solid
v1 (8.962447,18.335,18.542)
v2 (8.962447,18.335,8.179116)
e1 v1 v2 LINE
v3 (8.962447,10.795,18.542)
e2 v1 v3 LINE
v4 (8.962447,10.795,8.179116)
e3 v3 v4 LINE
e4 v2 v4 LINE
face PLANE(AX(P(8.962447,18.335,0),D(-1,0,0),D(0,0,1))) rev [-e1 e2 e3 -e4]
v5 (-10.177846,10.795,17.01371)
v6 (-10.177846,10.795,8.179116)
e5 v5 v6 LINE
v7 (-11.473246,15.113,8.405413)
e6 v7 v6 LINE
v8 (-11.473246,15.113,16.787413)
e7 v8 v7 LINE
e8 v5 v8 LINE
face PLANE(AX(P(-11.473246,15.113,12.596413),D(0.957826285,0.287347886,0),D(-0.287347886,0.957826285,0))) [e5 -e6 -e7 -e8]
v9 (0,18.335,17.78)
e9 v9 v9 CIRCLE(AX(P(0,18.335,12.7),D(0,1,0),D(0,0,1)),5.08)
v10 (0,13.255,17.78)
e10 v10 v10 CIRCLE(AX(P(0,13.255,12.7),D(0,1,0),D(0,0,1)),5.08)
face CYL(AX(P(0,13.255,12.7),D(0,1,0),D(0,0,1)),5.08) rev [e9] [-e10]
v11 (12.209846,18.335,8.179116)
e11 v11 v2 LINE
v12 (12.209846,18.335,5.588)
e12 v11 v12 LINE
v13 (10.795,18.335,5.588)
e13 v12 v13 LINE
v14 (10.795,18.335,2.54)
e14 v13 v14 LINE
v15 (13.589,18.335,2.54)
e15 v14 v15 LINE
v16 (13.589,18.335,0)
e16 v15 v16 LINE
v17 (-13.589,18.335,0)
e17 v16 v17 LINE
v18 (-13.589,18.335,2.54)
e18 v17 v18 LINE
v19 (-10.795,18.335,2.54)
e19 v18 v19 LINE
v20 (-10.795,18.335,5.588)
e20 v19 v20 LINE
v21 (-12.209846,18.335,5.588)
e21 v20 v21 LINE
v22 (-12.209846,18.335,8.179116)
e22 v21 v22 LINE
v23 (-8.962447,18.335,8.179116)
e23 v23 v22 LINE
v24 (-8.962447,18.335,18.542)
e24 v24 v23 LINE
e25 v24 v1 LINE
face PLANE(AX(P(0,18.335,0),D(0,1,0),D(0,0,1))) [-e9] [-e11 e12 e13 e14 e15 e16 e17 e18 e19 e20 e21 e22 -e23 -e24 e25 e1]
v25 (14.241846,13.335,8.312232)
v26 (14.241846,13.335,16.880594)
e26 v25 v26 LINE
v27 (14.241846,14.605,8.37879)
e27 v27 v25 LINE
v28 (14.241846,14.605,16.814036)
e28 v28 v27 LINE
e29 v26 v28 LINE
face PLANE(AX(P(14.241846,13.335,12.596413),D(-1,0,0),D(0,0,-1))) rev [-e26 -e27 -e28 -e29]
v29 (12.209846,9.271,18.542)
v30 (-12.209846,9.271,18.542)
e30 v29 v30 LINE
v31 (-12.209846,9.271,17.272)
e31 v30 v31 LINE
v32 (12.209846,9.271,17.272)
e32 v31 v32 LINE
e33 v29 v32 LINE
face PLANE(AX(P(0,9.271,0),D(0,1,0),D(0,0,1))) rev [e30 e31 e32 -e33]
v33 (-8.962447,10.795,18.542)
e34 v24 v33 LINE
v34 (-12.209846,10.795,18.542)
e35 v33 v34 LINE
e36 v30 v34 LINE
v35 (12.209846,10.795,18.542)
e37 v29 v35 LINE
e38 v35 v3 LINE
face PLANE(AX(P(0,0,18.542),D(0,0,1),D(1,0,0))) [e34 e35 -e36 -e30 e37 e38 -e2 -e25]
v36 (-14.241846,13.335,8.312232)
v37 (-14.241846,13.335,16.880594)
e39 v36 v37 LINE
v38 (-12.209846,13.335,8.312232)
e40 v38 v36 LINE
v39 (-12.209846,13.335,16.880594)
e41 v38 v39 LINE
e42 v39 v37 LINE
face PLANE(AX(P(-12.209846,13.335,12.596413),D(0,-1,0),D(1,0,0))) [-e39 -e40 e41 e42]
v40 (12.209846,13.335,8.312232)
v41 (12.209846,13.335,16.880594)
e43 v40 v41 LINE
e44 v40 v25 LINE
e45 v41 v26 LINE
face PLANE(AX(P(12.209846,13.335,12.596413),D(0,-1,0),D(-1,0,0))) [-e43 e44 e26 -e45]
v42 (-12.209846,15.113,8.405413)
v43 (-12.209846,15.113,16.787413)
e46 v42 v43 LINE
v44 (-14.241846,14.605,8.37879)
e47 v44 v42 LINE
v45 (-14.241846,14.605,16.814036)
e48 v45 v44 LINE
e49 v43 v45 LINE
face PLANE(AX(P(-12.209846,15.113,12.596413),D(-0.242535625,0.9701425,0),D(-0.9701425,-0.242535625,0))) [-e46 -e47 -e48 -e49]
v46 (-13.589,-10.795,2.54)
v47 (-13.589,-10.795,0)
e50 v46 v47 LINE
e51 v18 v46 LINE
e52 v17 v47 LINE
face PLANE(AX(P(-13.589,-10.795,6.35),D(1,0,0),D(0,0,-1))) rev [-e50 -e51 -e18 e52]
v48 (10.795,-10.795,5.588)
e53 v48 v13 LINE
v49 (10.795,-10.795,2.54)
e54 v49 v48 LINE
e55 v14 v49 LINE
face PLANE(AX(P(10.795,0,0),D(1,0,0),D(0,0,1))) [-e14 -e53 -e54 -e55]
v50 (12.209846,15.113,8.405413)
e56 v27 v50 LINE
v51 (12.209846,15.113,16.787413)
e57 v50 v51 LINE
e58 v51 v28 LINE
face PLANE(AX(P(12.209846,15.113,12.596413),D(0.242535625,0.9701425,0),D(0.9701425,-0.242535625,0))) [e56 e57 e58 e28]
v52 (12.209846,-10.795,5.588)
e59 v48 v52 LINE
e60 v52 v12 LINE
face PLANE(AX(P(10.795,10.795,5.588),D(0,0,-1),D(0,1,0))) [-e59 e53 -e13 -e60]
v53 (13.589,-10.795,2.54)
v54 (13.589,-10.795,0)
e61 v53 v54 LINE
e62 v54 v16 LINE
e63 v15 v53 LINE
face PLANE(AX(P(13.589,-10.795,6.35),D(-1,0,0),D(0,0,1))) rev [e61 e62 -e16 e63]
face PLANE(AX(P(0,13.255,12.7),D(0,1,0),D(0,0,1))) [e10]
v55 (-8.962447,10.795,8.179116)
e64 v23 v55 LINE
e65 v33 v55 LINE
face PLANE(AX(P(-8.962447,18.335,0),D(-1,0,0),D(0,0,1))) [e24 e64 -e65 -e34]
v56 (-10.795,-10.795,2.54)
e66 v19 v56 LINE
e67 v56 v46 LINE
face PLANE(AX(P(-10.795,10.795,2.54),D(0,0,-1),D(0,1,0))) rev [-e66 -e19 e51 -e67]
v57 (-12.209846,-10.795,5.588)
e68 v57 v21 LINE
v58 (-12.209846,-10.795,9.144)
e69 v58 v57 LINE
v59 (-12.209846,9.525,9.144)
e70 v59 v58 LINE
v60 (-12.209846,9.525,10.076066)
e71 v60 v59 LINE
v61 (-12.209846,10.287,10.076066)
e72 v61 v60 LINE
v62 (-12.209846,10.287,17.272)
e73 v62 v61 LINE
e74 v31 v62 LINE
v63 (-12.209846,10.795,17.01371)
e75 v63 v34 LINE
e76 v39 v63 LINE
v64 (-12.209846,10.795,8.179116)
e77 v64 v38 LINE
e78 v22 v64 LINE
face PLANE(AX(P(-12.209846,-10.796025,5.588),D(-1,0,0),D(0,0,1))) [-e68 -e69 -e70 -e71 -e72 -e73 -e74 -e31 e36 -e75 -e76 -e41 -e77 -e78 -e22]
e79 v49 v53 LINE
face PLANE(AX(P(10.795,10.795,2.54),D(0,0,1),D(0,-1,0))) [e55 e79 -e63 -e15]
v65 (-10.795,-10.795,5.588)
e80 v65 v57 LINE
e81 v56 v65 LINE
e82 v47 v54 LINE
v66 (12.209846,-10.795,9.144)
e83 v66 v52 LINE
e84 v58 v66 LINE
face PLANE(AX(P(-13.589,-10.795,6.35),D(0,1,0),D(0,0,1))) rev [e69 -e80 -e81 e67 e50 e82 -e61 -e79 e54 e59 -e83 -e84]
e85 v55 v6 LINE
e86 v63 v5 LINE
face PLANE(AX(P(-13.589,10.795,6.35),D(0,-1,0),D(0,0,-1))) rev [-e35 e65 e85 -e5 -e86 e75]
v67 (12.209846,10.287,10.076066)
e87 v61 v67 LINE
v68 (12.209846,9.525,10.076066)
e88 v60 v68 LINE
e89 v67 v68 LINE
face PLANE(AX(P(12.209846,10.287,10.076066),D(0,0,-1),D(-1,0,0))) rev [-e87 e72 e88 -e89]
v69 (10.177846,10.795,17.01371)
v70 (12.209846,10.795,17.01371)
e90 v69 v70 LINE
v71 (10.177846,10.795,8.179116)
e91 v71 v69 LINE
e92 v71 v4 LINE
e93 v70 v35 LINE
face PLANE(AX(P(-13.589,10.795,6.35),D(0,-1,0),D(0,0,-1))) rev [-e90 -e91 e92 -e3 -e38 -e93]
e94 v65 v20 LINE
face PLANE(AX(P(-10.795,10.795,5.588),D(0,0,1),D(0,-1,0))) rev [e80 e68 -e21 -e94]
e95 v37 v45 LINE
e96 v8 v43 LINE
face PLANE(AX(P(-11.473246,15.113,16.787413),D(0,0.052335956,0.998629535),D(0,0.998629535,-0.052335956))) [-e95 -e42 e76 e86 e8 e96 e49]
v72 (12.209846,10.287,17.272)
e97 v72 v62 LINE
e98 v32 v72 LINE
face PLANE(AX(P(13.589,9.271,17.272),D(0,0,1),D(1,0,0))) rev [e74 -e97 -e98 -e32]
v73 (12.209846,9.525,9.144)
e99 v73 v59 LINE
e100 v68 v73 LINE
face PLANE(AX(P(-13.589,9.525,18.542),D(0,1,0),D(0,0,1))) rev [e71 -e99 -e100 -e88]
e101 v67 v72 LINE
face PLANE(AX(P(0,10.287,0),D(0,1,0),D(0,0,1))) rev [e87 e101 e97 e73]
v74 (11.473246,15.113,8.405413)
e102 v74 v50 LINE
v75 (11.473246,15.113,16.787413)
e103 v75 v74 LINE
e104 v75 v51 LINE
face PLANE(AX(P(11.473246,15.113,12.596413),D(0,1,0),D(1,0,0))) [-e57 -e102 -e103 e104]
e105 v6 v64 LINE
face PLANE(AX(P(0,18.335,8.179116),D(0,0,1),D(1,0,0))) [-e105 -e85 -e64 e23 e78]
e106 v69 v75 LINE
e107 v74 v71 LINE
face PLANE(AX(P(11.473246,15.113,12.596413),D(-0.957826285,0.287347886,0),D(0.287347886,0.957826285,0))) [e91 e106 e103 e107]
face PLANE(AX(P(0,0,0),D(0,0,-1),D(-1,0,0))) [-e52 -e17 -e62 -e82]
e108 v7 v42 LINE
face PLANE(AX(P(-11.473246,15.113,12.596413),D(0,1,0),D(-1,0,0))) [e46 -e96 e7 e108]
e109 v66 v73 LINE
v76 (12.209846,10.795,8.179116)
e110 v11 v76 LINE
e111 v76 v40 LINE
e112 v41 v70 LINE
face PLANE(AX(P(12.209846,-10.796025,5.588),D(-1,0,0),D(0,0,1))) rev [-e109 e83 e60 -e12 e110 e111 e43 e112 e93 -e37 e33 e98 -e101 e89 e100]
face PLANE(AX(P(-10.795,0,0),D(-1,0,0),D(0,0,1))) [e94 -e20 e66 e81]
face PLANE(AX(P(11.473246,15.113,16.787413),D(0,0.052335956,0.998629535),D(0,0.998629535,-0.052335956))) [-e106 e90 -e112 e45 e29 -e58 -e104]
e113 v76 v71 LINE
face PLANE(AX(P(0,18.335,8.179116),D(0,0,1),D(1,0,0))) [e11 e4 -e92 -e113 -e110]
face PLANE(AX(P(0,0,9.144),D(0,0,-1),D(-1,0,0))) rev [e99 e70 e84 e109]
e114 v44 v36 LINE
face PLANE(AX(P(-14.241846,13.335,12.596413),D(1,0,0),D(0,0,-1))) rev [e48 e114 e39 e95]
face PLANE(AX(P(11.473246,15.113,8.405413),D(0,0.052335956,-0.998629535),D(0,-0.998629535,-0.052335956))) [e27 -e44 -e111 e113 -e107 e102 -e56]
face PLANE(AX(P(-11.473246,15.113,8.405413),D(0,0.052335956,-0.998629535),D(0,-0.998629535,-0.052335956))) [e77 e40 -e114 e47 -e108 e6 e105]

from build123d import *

# Parameters (mm, degrees)
SKETCH2_W                       = 27.178
SKETCH2_H                       = 21.59
INITIAL_EXTRUDE_DEPTH           = 6.35
SKETCH3_W                       = 27.178
SKETCH3_H                       = 1.27
INTIAL_EXTRUDE_HORIZONTAL_DEPTH = 12.192
SKETCH4_W                       = 27.178
SKETCH4_H                       = 1.27
SLIGHT_EXTRUDE_VERTICAL_DEPTH   = 0.254
SKETCH5_W                       = 3.048
SKETCH5_H                       = 21.59
CUT_EXTRUDE1_DEPTH              = 2.794
CUT_EXTRUDE2_REACH              = 33.537
SKETCH6_W                       = 1.379153921
SKETCH6_H                       = 12.954
SNAP_START                      = 11.473246079
SNAP_HOOK2_DEPTH                = 0.7366
SNAP_START_2                    = 8.31223189
SNAP_HOOK2_2_DEPTH              = 8.568362063
SNAP_START_3                    = 8.179116131
SNAP_HOOK2_3_DEPTH              = 8.834593581
SNAP_START_4                    = 9
SNAP_HOOK2_4_DEPTH              = 6
BOSS_EXTRUDE1_DEPTH             = 7.54
SKETCH8_W                       = 24.419692158
SKETCH8_H                       = 7.195933706
CUT_EXTRUDE3_DEPTH              = 0.762
SKETCH9_W                       = 24.419692158
SKETCH9_H                       = 20.32
BOSS_EXTRUDE2_DEPTH             = 2.794
SKETCH10_R                      = 5.08
CUT_EXTRUDE4_DEPTH              = 5.08


with BuildPart() as part:
    # Sketch2 → Initial Extrude (new body)
    with BuildSketch(Plane.XY):
        Rectangle(SKETCH2_W, SKETCH2_H)
    extrude(amount=INITIAL_EXTRUDE_DEPTH)

    # Sketch3 → Intial Extrude horizontal (add)
    with BuildSketch(Plane.XY.offset(6.35)):
        with Locations((0, 10.16)):
            Rectangle(SKETCH3_W, SKETCH3_H)
    extrude(amount=INTIAL_EXTRUDE_HORIZONTAL_DEPTH)

    # Sketch4 → Slight Extrude vertical (add)
    with BuildSketch(Plane.XZ.offset(-9.525)):
        with Locations((0, 17.907)):
            Rectangle(SKETCH4_W, SKETCH4_H)
    extrude(amount=SLIGHT_EXTRUDE_VERTICAL_DEPTH)

    # Sketch5 → Cut-Extrude1 (cut)
    with BuildSketch(Plane.ZY.offset(13.589)):
        with Locations((4.064, 0)):
            Rectangle(SKETCH5_W, SKETCH5_H)
    cut_extrude1 = extrude(amount=-CUT_EXTRUDE1_DEPTH, mode=Mode.SUBTRACT)

    # Mirror3: Cut-Extrude1 across plane
    add(cut_extrude1.mirror(Plane(origin=(0, 0, 0), x_dir=(0, 0, 1), z_dir=(1, 0, 0))), mode=Mode.SUBTRACT)

    # Sketch6 → Cut-Extrude2 (cut, up to next)
    with BuildSketch(Plane(origin=(0, 10.795, 0), x_dir=(1, 0, 0), z_dir=(0, 1, 0)), mode=Mode.PRIVATE) as cut_extrude2_sk1:
        with Locations((12.89942304, -12.065)):
            Rectangle(SKETCH6_W, SKETCH6_H)
    cut_extrude2_tool1 = extrude(cut_extrude2_sk1.sketch, amount=-CUT_EXTRUDE2_REACH, mode=Mode.PRIVATE) & part.part
    cut_extrude2 = cut_extrude2_tool1.solids().sort_by_distance((12.899423, 10.795, 12.065))[0]
    add(cut_extrude2, mode=Mode.SUBTRACT)

    # Mirror7: Cut-Extrude2 across plane
    add(cut_extrude2.mirror(Plane(origin=(0, 0, 0), x_dir=(0, 0, 1), z_dir=(1, 0, 0))), mode=Mode.SUBTRACT)

    # Snap Hook2: read off the stored shape, not the designer's step
    # Snap Hook2 outline → Snap Hook2 (add)
    with BuildSketch(Plane.YZ.offset(SNAP_START)):
        Polygon((10.795, 17.013709712), (10.795, 8.179116131), (15.113, 8.405412922), (15.113, 16.787412922), align=None)
    snap_hook2 = extrude(amount=SNAP_HOOK2_DEPTH)

    # Snap Hook2 2 outline → Snap Hook2 2 (add)
    with BuildSketch(Plane.XY.offset(SNAP_START_2)):
        Polygon((11.473246079, 10.795), (11.473246079, 15.113), (10.177846079, 10.795), align=None)
        Polygon((12.209846079, 15.113), (12.209846079, 13.335), (14.241846079, 13.335), (14.241846079, 14.605), align=None)
    snap_hook2_2 = extrude(amount=SNAP_HOOK2_2_DEPTH)

    # Snap Hook2 3 outline → Snap Hook2 3 (add)
    with BuildSketch(Plane.XY.offset(SNAP_START_3)):
        Polygon((11.473246079, 10.795), (11.473246079, 15.113), (10.177846079, 10.795), align=None)
    snap_hook2_3 = extrude(amount=SNAP_HOOK2_3_DEPTH)

    # Snap Hook2 4 outline → Snap Hook2 4 (cut)
    with BuildSketch(Plane.YZ.offset(SNAP_START_4)):
        Polygon((10.795, 8.179116131), (17, 8.179116131), (17, 8.504306402), (15.113, 8.405412922), align=None)
        Polygon((15.113, 16.787412922), (17, 16.688519443), (17, 17.013709712), (10.795, 17.013709712), align=None)
    snap_hook2_4 = extrude(amount=SNAP_HOOK2_4_DEPTH, mode=Mode.SUBTRACT)

    # Mirror6: Snap Hook2, Snap Hook2 2, Snap Hook2 3, Snap Hook2 4 across plane
    add(snap_hook2.mirror(Plane(origin=(0, 0, 0), x_dir=(0, 0, 1), z_dir=(1, 0, 0))))
    add(snap_hook2_2.mirror(Plane(origin=(0, 0, 0), x_dir=(0, 0, 1), z_dir=(1, 0, 0))))
    add(snap_hook2_3.mirror(Plane(origin=(0, 0, 0), x_dir=(0, 0, 1), z_dir=(1, 0, 0))))
    add(snap_hook2_4.mirror(Plane(origin=(0, 0, 0), x_dir=(0, 0, 1), z_dir=(1, 0, 0))), mode=Mode.SUBTRACT)

    # Sketch7 → Boss-Extrude1 (add)
    with BuildSketch(Plane(origin=(0, 10.795, 0), x_dir=(1, 0, 0), z_dir=(0, 1, 0))):
        Polygon((-8.962447439, -8.179116131), (-8.962447439, -18.542), (8.962447439, -18.542), (8.962447439, -8.179116131), (9, -8.179116131), (10.177846079, -8.179116131), (12.209846079, -8.179116131), (12.209846079, -5.588), (10.795, -5.588), (10.795, -2.54), (13.589, -2.54), (13.589, 0), (-13.589, 0), (-13.589, -2.54), (-10.795, -2.54), (-10.795, -5.588), (-12.209846079, -5.588), (-12.209846079, -8.179116131), (-10.177846079, -8.179116131), (-9, -8.179116131), align=None)
    extrude(amount=BOSS_EXTRUDE1_DEPTH)

    # Sketch8 → Cut-Extrude3 (cut)
    with BuildSketch(Plane.XZ.offset(-9.525)):
        with Locations((0, 13.674033147)):
            Rectangle(SKETCH8_W, SKETCH8_H)
    extrude(amount=-CUT_EXTRUDE3_DEPTH, mode=Mode.SUBTRACT)

    # Sketch9 → Boss-Extrude2 (add)
    with BuildSketch(Plane.XY.offset(6.35)):
        with Locations((0, -0.635)):
            Rectangle(SKETCH9_W, SKETCH9_H)
    extrude(amount=BOSS_EXTRUDE2_DEPTH)

    # Sketch10 → Cut-Extrude4 (cut)
    with BuildSketch(Plane(origin=(0, 18.335, 0), x_dir=(1, 0, 0), z_dir=(0, 1, 0))):
        with Locations(Location((0, -12.7, 0), (0, 0, 270))):
            Circle(SKETCH10_R)
    extrude(amount=-CUT_EXTRUDE4_DEPTH, mode=Mode.SUBTRACT)


solid = part.part
